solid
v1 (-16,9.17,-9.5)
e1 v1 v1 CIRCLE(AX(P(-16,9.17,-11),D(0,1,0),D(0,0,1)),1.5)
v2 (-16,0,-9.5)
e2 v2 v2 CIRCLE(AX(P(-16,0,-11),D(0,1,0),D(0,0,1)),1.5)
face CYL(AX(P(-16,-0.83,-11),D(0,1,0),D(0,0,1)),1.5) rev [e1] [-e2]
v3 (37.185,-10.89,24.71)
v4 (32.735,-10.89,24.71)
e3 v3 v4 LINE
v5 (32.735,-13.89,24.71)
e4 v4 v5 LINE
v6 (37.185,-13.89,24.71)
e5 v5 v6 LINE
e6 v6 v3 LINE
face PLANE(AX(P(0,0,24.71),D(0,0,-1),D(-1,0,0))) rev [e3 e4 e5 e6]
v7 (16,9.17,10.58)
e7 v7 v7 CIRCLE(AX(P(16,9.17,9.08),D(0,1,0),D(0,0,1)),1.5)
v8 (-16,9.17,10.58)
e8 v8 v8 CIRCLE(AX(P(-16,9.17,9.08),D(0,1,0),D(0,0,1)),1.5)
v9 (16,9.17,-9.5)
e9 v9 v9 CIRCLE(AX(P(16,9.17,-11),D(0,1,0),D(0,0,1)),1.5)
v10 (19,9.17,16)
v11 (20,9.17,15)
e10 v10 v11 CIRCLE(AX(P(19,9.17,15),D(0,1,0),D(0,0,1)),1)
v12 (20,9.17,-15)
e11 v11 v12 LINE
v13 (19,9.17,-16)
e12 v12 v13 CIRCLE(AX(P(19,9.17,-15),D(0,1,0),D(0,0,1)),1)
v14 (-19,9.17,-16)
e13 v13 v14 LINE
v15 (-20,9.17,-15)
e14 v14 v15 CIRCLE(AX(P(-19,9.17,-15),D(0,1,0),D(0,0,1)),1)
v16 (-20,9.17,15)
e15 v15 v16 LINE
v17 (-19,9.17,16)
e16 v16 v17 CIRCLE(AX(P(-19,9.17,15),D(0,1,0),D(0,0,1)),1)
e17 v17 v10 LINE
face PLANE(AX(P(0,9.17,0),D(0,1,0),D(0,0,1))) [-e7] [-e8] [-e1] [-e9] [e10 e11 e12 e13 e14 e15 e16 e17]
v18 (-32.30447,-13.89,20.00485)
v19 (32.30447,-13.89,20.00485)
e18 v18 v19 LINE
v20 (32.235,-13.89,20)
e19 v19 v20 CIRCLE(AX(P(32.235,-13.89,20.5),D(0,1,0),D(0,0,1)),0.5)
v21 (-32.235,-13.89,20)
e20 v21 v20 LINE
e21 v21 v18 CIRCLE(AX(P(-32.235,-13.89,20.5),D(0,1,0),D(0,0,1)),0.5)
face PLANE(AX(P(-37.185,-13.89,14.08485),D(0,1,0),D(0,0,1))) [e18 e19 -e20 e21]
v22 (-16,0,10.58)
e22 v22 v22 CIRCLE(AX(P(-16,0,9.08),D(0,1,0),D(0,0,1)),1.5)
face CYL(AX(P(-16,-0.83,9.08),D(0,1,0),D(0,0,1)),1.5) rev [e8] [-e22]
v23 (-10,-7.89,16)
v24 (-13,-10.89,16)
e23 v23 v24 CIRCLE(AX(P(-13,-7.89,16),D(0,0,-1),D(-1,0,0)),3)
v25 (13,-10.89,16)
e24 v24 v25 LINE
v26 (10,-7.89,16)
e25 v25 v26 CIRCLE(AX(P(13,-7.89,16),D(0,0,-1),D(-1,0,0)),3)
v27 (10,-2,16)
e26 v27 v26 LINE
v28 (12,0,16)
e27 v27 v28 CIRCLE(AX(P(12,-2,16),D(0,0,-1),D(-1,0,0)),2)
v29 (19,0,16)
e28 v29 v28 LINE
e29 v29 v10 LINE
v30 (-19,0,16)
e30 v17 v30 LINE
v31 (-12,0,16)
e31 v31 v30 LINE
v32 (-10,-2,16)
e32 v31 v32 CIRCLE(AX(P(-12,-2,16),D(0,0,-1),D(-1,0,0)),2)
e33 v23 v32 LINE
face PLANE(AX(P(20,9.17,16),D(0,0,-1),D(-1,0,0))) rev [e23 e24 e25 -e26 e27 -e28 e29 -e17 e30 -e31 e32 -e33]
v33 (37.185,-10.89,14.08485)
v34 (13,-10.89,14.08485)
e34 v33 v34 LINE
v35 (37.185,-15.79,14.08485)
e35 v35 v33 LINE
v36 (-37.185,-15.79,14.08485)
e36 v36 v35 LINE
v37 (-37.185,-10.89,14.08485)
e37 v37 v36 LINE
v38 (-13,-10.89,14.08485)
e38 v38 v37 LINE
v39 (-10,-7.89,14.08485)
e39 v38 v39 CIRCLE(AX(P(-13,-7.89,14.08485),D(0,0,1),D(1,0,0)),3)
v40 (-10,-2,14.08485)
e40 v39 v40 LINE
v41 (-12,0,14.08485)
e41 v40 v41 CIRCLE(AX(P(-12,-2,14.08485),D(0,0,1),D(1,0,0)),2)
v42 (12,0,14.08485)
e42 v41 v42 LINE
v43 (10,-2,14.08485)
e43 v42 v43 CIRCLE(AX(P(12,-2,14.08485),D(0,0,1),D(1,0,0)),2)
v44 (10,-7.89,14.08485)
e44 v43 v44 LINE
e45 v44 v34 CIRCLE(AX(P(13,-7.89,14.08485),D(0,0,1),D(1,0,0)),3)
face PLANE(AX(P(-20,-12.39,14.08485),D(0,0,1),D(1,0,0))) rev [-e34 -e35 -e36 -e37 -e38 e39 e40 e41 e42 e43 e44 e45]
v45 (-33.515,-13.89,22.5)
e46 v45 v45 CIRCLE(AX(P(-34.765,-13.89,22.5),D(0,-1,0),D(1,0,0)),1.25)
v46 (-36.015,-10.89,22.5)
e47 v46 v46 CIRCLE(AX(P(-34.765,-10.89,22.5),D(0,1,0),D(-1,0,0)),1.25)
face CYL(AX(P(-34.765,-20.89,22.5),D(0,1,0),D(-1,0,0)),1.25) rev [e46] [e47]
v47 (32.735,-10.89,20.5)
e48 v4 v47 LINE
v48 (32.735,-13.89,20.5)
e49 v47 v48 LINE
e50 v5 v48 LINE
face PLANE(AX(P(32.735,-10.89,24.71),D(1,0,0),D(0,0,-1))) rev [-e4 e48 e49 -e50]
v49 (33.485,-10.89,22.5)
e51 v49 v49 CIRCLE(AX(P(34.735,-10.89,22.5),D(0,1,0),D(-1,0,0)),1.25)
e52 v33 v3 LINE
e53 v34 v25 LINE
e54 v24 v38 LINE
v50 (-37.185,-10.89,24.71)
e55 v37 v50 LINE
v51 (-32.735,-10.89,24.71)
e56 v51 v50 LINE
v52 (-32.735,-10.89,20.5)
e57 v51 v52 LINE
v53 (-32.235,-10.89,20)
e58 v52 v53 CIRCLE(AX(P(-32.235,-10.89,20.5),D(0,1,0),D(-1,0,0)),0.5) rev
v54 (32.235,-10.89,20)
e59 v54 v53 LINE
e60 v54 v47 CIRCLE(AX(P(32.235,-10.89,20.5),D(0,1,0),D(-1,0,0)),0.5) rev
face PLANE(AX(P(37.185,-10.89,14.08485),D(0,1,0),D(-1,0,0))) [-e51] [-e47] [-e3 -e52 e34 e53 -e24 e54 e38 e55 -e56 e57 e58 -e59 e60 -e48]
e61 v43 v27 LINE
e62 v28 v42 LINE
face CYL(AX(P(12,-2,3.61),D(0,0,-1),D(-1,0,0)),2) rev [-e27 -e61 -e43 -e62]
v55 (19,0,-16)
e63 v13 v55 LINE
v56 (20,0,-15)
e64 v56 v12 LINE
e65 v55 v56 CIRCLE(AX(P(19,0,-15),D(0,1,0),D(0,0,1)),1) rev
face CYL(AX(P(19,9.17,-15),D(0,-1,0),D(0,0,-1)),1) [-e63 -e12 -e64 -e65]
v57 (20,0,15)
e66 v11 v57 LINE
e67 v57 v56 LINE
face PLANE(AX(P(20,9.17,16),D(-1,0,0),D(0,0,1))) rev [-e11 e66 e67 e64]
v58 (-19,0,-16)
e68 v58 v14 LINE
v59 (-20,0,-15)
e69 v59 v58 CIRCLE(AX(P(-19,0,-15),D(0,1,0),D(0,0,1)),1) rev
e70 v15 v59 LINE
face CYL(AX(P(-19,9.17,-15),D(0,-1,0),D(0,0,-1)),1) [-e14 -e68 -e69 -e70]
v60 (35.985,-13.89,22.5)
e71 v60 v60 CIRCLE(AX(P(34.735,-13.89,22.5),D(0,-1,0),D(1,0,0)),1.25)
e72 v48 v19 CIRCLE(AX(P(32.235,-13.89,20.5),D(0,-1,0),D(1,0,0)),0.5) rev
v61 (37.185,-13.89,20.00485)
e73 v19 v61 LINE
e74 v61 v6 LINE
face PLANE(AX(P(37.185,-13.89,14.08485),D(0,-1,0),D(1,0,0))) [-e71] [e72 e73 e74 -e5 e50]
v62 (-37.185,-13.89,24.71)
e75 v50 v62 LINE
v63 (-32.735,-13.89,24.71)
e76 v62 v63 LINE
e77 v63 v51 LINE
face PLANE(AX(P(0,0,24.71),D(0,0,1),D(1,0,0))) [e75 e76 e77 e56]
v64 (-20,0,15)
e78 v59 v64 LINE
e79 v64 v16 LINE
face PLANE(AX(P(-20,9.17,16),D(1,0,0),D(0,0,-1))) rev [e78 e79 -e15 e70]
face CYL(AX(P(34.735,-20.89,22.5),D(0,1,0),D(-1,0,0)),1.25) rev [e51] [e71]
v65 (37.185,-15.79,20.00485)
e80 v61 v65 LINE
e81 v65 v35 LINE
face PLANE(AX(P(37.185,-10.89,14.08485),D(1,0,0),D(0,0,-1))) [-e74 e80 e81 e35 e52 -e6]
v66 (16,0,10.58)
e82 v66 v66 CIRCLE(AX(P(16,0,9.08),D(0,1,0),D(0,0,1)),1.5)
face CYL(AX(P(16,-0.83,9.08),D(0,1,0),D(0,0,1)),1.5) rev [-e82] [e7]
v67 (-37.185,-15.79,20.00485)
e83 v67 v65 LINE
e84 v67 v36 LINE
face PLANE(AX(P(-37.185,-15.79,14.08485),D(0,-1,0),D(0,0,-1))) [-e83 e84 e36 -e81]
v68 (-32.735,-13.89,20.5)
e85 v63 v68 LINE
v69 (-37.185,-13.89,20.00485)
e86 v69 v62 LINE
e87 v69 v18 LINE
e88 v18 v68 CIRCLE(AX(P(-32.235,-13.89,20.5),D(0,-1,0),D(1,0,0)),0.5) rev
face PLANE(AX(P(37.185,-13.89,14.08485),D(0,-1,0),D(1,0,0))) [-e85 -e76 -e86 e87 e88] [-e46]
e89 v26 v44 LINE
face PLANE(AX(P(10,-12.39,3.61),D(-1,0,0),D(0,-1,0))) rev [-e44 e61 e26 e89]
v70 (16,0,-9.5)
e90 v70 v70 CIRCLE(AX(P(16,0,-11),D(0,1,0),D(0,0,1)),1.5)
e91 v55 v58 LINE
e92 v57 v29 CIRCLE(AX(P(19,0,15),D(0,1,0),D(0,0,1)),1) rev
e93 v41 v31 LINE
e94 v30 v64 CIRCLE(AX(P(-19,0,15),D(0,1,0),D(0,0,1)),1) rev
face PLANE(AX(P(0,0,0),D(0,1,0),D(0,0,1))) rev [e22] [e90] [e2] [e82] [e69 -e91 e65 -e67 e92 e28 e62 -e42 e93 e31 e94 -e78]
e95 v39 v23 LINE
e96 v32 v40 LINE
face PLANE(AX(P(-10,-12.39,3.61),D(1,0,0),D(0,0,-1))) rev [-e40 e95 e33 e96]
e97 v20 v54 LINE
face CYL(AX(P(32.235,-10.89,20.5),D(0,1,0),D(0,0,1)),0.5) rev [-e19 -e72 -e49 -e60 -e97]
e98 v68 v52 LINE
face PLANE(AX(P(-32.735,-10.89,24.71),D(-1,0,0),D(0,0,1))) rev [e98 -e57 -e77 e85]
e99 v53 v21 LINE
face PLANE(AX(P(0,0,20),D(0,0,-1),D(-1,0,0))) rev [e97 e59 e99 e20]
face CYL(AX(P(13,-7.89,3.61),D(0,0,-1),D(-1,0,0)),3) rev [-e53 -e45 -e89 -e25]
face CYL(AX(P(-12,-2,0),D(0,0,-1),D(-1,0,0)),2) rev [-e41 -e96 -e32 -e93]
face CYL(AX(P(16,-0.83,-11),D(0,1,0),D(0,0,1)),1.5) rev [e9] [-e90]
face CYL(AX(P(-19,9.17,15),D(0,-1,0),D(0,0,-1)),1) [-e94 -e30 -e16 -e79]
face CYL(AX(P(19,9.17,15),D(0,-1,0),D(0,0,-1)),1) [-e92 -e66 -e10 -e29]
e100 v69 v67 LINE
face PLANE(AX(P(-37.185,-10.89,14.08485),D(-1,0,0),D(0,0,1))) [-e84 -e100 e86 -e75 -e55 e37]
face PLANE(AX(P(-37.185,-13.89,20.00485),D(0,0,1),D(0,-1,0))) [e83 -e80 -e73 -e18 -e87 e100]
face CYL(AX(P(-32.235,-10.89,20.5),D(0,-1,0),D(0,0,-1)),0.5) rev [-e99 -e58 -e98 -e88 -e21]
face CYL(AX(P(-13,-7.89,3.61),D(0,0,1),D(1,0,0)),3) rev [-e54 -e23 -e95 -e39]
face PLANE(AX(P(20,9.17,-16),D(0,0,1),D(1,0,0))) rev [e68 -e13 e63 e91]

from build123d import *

# Parameters (mm, degrees)
IZIM2_W                          = 40
IZIM2_H                          = 32
Y_KSEKLIK_EKSTR_ZYON1_DEPTH      = 9.17
IZIM3_W                          = 40
IZIM3_H                          = 1.915150366
Y_KSEKLIK_EKSTR_ZYON2_DEPTH      = 12.39
IZIM4_W                          = 10
IZIM4_H                          = 12.39
KES_EKSTR_ZYON1_DEPTH            = 12.39
Y_KSEKLIK_EKSTR_ZYON3_DEPTH      = 4
Y_KSEKLIK_EKSTR_ZYON3_DEPTH_BACK = 1.91515
IZIM5_W                          = 74.37
IZIM5_H                          = 3
IZIM6_W                          = 4.45
IZIM6_H                          = 3
Y_KSEKLIK_EKSTR_ZYON4_DEPTH      = 4.71
IZIM7_W                          = 5.92
IZIM7_H                          = 1.9
Y_KSEKLIK_EKSTR_ZYON5_DEPTH      = 74.37
RADYUS1_R                        = 3
RADYUS2_R                        = 2
RADYUS3_R                        = 1
RADYUS4_R                        = 0.5
IZIM8_R                          = 1.25
KES_EKSTR_ZYON2_DEPTH            = 10
IZIM9_R                          = 1.5
KES_EKSTR_ZYON3_DEPTH            = 10


with BuildPart() as part:
    # Çizim2 → Yükseklik-Ekstrüzyon1 (new body)
    with BuildSketch(Plane(origin=(0, 0, 0), x_dir=(1, 0, 0), z_dir=(0, 1, 0))):
        Rectangle(IZIM2_W, IZIM2_H)
    extrude(amount=Y_KSEKLIK_EKSTR_ZYON1_DEPTH)

    # Çizim3 → Yükseklik-Ekstrüzyon2 (add)
    with BuildSketch(Plane(origin=(0, 0, 0), x_dir=(-1, 0, 0), z_dir=(0, -1, 0))):
        with Locations((0, -15.042424817)):
            Rectangle(IZIM3_W, IZIM3_H)
    extrude(amount=Y_KSEKLIK_EKSTR_ZYON2_DEPTH)

    # Çizim4 → Kes-Ekstrüzyon1 (cut)
    with BuildSketch(Plane.XY.offset(16)):
        with Locations((-15, -6.195)):
            Rectangle(IZIM4_W, IZIM4_H)
        with Locations((15, -6.195)):
            Rectangle(IZIM4_W, IZIM4_H)
    extrude(amount=-KES_EKSTR_ZYON1_DEPTH, mode=Mode.SUBTRACT)

    # Çizim5 → Yükseklik-Ekstrüzyon3 (add, two sides: drawn at the far end of the back side and taken through both)
    with BuildSketch(Plane.XY.offset(16).offset(-Y_KSEKLIK_EKSTR_ZYON3_DEPTH_BACK)):
        with Locations((0, -12.39)):
            Rectangle(IZIM5_W, IZIM5_H)
    extrude(amount=Y_KSEKLIK_EKSTR_ZYON3_DEPTH + Y_KSEKLIK_EKSTR_ZYON3_DEPTH_BACK)

    # Çizim6 → Yükseklik-Ekstrüzyon4 (add)
    with BuildSketch(Plane.XY.offset(20)):
        with Locations((-34.96, -12.39)):
            Rectangle(IZIM6_W, IZIM6_H)
        with Locations((34.96, -12.39)):
            Rectangle(IZIM6_W, IZIM6_H)
    extrude(amount=Y_KSEKLIK_EKSTR_ZYON4_DEPTH)

    # Çizim7 → Yükseklik-Ekstrüzyon5 (add)
    with BuildSketch(Plane(origin=(37.185, 0, 0), x_dir=(0, 0, -1), z_dir=(1, 0, 0))):
        with Locations((-17.044849634, -14.84)):
            Rectangle(IZIM7_W, IZIM7_H)
    extrude(amount=-Y_KSEKLIK_EKSTR_ZYON5_DEPTH)

    # Radyus1
    radyus1_edges = [part.edges().sort_by_distance(p)[0] for p in [
        (-10, -10.89, 15.042425),
        (10, -10.89, 15.042425),
    ]]
    fillet(radyus1_edges, radius=RADYUS1_R)

    # Radyus2
    radyus2_edges = [part.edges().sort_by_distance(p)[0] for p in [
        (-10, 0, 15.042424817),
        (10, 0, 15.042424817),
    ]]
    fillet(radyus2_edges, radius=RADYUS2_R)

    # Radyus3
    radyus3_edges = [part.edges().sort_by_distance(p)[0] for p in [
        (-20, 4.585, -16),
        (20, 4.585, -16),
        (20, 4.585, 16),
        (-20, 4.585, 16),
    ]]
    fillet(radyus3_edges, radius=RADYUS3_R)

    # Radyus4
    # the kernel refuses this fillet: 0.5 mm, written as the material it adds along each edge
    with BuildSketch(Plane(origin=(-32.735, -10.89, 20), x_dir=(1, 0, 0), z_dir=(0, -1, 0)), Plane(origin=(32.735, -10.89, 20), x_dir=(0, 0, 1), z_dir=(0, -1, 0))) as radyus4_piece_1:
        with BuildLine():
            CenterArc((RADYUS4_R, RADYUS4_R), RADYUS4_R, 180, 90)
            Line((0, RADYUS4_R), (0, 0))
            Line((0, 0), (RADYUS4_R, 0))
        make_face()
    extrude(amount=3)

    # Çizim8 → Kes-Ekstrüzyon2 (cut)
    with BuildSketch(Plane(origin=(0, -10.89, 0), x_dir=(1, 0, 0), z_dir=(0, 1, 0))):
        with Locations(Location((-34.765, -22.5, 0), (0, 0, 180))):
            Circle(IZIM8_R)
        with Locations(Location((34.735, -22.5, 0), (0, 0, 180))):
            Circle(IZIM8_R)
    extrude(amount=-KES_EKSTR_ZYON2_DEPTH, mode=Mode.SUBTRACT)

    # Çizim9 → Kes-Ekstrüzyon3 (cut)
    with BuildSketch(Plane(origin=(0, 9.17, 0), x_dir=(1, 0, 0), z_dir=(0, 1, 0))):
        with Locations(Location((-16, -9.08, 0), (0, 0, 270))):
            Circle(IZIM9_R)
        with Locations(Location((-16, 11, 0), (0, 0, 270))):
            Circle(IZIM9_R)
        with Locations(Location((16, 11, 0), (0, 0, 270))):
            Circle(IZIM9_R)
        with Locations(Location((16, -9.08, 0), (0, 0, 270))):
            Circle(IZIM9_R)
    extrude(amount=-KES_EKSTR_ZYON3_DEPTH, mode=Mode.SUBTRACT)


solid = part.part
